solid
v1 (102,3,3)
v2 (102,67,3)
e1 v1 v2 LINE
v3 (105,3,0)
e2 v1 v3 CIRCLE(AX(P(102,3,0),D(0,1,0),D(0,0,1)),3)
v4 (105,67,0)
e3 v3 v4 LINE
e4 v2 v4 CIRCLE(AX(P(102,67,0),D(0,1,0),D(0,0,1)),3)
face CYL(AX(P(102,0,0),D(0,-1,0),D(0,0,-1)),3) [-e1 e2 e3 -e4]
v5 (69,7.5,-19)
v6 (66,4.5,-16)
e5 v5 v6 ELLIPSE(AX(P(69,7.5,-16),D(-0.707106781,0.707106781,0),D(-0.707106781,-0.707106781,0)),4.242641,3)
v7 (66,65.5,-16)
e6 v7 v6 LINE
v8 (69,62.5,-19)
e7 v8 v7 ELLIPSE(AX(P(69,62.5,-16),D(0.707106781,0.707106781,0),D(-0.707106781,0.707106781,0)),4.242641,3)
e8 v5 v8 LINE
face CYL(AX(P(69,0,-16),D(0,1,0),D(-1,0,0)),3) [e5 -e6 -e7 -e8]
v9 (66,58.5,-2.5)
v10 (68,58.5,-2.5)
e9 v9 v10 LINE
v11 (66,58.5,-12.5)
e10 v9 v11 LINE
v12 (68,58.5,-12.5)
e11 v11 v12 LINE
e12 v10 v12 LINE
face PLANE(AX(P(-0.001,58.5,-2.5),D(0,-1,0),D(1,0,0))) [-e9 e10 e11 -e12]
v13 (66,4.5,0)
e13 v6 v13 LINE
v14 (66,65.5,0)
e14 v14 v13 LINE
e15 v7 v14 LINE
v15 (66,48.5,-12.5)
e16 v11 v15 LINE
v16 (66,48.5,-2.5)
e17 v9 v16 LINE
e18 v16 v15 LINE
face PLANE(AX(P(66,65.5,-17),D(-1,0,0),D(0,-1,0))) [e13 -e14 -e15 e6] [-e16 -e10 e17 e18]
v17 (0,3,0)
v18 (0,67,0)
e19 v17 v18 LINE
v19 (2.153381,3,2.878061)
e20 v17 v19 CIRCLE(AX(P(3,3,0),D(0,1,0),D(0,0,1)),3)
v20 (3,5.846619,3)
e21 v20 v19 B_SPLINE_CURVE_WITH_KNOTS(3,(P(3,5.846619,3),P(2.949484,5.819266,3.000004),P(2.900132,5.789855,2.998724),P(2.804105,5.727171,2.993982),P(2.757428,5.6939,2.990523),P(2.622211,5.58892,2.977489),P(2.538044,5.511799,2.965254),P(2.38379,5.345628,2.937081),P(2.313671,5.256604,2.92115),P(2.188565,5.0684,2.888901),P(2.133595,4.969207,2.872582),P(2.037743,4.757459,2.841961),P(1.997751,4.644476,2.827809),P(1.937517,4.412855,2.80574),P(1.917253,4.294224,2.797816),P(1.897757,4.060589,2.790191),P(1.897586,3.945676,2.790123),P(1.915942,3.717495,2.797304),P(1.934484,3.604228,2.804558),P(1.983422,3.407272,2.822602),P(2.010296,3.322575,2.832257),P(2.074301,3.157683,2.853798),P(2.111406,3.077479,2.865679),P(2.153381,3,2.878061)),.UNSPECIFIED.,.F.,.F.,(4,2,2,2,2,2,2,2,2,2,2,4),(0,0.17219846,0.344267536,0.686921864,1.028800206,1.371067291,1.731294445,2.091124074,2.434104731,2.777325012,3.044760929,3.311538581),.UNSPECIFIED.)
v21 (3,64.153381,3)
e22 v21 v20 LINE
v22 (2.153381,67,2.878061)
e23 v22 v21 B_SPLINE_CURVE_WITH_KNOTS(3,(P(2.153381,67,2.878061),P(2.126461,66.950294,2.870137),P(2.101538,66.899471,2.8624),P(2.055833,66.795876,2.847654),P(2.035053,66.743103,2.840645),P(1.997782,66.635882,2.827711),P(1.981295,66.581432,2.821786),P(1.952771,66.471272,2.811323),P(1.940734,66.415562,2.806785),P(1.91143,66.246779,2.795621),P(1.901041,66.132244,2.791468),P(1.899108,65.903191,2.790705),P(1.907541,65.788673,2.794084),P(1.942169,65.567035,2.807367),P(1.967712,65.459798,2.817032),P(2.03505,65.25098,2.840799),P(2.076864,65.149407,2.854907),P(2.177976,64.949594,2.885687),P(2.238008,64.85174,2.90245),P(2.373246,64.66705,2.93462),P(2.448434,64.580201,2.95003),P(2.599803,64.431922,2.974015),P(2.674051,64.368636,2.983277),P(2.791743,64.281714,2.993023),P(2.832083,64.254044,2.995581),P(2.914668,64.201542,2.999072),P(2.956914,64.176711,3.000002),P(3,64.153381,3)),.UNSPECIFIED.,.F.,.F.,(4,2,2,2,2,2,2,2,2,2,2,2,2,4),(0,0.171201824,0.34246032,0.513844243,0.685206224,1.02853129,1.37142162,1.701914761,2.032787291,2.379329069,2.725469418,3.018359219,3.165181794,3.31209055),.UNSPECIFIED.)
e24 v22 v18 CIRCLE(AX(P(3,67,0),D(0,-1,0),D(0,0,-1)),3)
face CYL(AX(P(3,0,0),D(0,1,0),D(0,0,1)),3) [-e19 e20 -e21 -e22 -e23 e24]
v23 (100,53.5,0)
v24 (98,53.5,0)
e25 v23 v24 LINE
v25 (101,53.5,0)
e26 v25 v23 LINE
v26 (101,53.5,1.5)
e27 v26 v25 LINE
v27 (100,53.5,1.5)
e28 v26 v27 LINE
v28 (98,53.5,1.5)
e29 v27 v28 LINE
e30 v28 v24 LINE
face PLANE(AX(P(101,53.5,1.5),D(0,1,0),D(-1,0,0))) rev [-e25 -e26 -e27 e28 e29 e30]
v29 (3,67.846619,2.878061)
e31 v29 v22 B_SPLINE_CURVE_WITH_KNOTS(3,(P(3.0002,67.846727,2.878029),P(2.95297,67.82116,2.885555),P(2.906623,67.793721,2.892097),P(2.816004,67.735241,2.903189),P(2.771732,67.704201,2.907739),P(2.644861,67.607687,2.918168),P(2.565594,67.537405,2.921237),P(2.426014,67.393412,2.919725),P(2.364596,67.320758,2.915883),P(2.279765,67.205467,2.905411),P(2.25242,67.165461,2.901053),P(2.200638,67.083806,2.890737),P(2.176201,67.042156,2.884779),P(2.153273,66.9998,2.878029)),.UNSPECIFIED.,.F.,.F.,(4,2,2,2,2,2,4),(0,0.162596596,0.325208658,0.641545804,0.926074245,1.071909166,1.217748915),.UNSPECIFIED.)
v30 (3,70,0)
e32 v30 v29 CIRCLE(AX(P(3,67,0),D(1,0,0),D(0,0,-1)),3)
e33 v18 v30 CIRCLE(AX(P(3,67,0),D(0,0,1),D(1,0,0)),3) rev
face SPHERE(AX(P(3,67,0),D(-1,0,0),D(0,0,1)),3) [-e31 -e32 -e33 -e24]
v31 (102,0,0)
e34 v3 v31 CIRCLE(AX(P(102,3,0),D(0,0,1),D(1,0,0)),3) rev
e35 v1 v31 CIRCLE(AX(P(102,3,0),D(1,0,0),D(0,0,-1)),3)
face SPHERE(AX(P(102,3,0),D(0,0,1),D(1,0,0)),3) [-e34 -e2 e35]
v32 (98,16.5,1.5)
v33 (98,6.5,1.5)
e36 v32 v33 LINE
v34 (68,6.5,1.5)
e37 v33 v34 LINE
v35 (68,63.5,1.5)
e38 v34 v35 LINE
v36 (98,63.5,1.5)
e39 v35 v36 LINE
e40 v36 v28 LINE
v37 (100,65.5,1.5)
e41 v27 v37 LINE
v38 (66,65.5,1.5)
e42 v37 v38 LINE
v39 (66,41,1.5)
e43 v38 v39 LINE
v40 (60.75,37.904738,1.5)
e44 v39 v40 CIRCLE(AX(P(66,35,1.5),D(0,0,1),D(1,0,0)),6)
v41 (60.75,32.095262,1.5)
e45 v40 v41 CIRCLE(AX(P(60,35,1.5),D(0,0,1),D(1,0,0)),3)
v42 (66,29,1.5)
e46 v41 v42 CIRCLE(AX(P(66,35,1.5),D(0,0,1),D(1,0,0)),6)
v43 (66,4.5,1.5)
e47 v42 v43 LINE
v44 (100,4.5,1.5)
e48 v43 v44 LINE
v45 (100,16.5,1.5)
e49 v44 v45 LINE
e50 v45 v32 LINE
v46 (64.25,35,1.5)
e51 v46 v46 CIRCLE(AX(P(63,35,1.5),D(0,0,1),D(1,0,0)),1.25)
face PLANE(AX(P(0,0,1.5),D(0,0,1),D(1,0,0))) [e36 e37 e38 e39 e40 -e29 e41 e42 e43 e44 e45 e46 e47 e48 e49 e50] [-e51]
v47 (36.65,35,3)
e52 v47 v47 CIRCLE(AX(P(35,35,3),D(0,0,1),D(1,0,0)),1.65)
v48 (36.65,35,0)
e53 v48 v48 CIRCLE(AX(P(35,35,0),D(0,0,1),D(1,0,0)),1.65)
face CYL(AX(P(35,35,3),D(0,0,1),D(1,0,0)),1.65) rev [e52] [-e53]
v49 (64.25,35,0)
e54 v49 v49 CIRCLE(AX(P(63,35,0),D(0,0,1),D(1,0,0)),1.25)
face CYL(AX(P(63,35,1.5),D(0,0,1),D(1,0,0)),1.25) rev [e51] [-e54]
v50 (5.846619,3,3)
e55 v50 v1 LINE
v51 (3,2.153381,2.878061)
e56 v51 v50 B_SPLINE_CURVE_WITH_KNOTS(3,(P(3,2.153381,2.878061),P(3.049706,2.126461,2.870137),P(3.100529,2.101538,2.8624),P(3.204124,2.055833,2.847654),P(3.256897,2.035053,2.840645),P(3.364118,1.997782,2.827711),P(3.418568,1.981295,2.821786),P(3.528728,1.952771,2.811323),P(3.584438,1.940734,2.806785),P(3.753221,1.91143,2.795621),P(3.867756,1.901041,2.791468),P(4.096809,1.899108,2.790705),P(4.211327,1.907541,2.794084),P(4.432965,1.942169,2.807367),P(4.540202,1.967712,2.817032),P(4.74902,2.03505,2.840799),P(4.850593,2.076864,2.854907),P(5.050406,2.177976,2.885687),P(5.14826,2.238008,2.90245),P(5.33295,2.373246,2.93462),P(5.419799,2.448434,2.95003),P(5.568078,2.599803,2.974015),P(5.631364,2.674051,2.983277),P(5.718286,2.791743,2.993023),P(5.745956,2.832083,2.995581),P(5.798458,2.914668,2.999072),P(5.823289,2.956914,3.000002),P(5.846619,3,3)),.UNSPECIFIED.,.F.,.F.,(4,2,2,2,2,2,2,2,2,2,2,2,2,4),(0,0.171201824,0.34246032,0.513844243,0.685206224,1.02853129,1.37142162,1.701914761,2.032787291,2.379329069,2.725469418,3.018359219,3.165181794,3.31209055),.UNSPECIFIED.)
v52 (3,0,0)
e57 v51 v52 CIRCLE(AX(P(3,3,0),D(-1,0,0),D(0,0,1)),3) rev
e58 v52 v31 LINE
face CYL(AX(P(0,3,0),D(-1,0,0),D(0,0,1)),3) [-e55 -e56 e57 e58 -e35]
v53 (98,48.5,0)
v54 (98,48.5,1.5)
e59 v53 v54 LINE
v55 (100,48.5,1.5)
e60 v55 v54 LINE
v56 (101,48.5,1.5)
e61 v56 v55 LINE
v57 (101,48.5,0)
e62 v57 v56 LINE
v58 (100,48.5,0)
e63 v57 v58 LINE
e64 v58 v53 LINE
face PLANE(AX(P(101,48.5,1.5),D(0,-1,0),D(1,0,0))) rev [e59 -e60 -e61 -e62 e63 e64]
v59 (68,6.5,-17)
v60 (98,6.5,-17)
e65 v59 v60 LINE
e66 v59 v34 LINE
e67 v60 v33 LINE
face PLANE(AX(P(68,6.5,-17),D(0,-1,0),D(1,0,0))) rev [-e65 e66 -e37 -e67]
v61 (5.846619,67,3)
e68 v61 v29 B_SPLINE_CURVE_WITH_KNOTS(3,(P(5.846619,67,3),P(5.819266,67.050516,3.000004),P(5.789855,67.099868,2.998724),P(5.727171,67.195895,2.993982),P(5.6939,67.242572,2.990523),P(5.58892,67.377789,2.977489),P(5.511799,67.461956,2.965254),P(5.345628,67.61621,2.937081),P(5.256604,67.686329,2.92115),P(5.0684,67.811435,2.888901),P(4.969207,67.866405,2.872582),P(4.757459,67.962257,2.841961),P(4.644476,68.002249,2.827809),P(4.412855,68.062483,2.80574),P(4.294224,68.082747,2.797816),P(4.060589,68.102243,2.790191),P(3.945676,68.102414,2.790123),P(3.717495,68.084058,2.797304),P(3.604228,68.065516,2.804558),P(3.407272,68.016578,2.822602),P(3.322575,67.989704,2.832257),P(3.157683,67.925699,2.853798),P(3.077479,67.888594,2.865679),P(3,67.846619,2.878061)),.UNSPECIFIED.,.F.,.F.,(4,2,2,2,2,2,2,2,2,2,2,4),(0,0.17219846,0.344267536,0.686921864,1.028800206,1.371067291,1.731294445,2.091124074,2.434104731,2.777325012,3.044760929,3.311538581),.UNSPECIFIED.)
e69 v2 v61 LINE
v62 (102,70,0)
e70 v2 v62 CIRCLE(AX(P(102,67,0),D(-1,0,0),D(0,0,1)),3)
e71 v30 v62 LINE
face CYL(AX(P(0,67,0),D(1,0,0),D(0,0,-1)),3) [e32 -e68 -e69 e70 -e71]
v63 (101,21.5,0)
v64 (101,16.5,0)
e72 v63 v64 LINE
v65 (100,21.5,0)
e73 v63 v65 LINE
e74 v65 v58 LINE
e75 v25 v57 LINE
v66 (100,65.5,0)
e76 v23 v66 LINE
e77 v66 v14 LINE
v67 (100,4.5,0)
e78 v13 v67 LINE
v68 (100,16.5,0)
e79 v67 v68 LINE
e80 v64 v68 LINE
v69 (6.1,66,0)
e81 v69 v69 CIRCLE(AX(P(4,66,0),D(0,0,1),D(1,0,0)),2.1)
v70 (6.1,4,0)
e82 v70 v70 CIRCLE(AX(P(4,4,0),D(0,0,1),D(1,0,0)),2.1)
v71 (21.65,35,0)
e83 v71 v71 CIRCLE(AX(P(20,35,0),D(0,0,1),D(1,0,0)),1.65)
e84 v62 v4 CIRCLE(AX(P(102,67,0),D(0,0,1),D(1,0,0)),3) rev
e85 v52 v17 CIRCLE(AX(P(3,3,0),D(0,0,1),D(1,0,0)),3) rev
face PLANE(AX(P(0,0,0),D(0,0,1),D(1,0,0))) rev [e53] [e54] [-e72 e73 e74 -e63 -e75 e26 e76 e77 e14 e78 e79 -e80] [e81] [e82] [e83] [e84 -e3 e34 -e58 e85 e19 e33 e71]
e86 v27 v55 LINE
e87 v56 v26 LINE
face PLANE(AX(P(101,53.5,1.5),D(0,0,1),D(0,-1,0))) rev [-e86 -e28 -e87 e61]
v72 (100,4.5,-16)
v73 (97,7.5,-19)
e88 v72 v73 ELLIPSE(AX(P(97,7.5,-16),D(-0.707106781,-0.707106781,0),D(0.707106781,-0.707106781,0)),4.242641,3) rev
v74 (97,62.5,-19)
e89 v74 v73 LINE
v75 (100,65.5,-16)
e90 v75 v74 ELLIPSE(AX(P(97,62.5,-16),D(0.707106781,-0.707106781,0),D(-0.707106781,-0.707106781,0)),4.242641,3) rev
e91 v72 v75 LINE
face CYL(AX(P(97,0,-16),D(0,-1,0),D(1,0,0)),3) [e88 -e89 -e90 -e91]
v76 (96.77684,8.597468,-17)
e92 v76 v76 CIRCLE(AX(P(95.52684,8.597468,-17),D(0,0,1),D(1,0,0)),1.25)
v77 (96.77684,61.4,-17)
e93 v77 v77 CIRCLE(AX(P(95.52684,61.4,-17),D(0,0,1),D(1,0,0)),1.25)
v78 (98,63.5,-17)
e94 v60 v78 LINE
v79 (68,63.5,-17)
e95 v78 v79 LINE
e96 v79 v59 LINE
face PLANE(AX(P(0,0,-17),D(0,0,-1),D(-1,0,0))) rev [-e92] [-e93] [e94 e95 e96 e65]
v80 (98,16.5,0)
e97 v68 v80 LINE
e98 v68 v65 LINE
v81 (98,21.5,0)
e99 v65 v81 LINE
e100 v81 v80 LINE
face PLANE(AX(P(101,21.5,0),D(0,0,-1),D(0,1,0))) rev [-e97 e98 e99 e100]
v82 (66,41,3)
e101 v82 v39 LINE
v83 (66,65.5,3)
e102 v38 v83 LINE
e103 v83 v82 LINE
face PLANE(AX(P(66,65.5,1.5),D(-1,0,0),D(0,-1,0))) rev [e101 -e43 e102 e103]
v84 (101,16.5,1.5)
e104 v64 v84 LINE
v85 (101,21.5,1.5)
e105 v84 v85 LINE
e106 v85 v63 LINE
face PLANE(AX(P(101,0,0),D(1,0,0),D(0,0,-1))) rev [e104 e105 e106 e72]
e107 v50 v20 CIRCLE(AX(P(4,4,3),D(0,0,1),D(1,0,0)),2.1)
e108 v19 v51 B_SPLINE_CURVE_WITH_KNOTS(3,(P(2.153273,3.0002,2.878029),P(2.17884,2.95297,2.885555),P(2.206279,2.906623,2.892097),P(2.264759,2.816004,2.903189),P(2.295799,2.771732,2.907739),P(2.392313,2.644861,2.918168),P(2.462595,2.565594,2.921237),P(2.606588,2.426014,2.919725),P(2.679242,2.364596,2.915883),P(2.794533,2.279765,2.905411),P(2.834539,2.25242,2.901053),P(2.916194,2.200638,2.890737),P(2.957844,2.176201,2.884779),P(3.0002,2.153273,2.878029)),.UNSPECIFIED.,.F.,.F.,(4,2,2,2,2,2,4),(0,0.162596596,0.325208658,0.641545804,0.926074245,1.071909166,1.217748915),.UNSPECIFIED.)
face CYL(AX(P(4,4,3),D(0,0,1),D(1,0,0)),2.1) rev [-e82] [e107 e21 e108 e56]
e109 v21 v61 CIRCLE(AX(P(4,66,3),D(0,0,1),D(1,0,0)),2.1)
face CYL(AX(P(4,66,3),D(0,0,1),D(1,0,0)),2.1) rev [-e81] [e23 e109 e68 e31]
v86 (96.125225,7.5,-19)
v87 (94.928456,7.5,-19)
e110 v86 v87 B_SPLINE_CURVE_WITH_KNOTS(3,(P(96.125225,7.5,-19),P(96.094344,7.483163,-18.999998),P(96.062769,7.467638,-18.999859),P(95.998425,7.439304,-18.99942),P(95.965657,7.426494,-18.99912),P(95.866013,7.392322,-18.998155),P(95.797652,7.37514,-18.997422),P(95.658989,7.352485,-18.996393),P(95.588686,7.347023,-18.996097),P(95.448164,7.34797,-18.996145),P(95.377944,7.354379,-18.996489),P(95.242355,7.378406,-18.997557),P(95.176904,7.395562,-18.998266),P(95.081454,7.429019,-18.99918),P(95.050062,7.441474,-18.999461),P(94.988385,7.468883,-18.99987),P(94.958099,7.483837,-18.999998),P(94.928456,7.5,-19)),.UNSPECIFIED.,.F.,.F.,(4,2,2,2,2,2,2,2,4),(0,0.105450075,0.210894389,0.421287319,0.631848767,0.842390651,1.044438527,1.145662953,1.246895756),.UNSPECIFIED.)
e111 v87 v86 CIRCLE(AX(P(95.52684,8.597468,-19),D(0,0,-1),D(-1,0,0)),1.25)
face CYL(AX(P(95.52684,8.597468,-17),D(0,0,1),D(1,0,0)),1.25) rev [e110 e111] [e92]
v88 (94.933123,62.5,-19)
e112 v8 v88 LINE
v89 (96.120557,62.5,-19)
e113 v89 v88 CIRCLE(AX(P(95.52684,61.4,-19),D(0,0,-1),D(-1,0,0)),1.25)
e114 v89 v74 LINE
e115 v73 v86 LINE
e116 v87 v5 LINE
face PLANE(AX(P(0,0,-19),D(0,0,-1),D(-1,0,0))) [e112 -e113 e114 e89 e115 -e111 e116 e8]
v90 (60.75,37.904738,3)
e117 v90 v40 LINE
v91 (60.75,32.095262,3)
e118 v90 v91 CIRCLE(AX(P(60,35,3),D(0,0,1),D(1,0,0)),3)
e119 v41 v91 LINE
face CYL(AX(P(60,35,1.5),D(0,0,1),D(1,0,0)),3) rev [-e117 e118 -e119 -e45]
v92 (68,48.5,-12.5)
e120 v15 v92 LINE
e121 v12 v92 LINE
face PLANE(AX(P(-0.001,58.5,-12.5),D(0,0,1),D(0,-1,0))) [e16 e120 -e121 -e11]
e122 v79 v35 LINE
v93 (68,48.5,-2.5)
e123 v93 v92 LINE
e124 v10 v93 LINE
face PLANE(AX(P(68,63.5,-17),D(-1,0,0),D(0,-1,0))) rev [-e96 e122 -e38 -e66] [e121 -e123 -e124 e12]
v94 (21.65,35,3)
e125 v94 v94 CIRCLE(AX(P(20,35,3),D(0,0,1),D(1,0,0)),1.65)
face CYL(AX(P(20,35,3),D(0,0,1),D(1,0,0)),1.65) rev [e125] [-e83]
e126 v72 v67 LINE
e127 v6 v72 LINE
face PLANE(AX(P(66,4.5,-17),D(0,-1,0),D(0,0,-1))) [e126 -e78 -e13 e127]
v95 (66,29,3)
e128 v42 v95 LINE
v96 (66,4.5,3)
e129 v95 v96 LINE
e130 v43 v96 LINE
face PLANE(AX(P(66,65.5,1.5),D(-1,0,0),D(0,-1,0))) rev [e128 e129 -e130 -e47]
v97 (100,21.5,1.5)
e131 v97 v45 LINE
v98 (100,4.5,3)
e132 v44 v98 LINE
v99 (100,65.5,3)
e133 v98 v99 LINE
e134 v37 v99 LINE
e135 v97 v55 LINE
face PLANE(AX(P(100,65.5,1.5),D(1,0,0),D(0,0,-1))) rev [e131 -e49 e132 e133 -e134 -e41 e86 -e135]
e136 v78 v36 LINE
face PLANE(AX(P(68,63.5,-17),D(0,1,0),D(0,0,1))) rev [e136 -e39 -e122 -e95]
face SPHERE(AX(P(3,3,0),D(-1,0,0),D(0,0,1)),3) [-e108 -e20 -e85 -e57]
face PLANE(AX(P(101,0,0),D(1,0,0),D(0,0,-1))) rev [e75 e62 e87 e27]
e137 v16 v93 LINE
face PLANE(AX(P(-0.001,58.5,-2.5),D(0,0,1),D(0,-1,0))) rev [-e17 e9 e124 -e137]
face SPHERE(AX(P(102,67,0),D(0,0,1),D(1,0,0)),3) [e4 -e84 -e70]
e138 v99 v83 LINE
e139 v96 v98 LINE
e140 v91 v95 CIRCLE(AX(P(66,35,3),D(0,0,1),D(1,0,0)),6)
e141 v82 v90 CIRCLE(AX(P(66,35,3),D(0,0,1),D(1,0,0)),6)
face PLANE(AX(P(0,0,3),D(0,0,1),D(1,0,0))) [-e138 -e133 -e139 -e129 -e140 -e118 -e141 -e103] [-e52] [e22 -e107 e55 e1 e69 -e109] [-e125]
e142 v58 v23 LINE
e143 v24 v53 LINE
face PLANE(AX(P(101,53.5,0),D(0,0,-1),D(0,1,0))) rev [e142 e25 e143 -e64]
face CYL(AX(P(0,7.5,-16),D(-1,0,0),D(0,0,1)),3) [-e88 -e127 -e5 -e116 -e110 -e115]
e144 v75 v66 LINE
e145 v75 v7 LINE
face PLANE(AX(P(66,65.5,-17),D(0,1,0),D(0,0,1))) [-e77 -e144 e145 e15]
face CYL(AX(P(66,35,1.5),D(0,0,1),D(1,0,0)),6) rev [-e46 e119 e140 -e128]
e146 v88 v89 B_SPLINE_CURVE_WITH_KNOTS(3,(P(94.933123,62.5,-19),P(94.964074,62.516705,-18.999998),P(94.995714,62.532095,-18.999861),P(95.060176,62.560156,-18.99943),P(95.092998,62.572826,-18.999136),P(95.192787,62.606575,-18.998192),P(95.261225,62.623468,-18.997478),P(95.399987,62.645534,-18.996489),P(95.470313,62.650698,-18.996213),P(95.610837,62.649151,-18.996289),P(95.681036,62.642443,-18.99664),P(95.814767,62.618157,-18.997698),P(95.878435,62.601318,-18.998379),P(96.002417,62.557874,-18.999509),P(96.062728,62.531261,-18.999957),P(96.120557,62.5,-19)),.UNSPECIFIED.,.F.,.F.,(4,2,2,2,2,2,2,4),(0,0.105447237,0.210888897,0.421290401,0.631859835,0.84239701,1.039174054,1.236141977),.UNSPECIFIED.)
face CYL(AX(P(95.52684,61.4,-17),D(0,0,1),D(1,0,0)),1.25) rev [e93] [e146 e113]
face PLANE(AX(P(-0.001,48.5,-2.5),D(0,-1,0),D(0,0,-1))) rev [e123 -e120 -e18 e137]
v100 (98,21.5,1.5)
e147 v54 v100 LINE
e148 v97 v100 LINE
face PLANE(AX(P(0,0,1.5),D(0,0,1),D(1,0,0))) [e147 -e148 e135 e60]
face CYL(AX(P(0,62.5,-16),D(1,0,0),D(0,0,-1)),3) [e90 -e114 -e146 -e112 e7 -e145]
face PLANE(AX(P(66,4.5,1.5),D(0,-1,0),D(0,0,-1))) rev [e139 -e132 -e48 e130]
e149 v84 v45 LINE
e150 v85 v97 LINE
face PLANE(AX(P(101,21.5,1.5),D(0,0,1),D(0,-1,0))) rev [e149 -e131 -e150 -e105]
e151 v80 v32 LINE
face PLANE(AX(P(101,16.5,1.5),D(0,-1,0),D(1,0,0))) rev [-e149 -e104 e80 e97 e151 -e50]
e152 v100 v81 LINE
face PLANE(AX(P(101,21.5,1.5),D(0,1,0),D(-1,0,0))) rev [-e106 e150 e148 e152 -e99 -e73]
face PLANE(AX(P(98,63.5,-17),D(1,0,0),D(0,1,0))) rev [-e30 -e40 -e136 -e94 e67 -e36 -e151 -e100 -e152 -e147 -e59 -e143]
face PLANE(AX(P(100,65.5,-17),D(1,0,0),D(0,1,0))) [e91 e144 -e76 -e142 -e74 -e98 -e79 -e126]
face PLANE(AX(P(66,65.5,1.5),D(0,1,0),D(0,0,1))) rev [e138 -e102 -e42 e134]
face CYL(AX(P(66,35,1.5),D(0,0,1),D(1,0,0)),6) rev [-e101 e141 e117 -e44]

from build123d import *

# Parameters (mm, degrees)
SKETCH1_W                   = 105
SKETCH1_H                   = 70
BOSS_EXTRUDE1_DEPTH         = 3
FILLET4_R                   = 3
FILLET5_R                   = 3
FILLET6_R                   = 3
M5X0_8_TAPPED_HOLE2_D       = 4.2
SKETCH16_6_W                = 34
SKETCH16_6_H                = 61
SKETCH16_6_W_2              = 30
SKETCH16_6_H_2              = 57
BOSS_EXTRUDE3_DEPTH         = 20
CUT_EXTRUDE8_REACH          = 129.334
SKETCH21_W                  = 30
SKETCH21_H                  = 57
SKETCH20_W                  = 34
SKETCH20_H                  = 61
BOSS_EXTRUDE4_DEPTH         = 2
SKETCH22_W                  = 34
SKETCH22_H                  = 61
CUT_EXTRUDE9_DEPTH          = 1.5
FILLET8_R                   = 3
SKETCH26_R                  = 6
CUT_EXTRUDE10_DEPTH         = 1.5
M3_TAPPED_HOLE1_D           = 2.5
M3_TAPPED_HOLE1_DEPTH       = 7.5
M3_TAPPED_HOLE1_TIP         = 0.751075774
SKETCH33_W                  = 1.5
SKETCH33_H                  = 5
CUT_EXTRUDE11_DEPTH         = 3
M3_TAPPED_HOLE2_D           = 2.5
M3_TAPPED_HOLE2_DEPTH       = 7.5
M3_TAPPED_HOLE2_TIP         = 0.751075774
M3_TAPPED_HOLE3_D           = 2.5
M3_TAPPED_HOLE3_DEPTH       = 7.5
M3_TAPPED_HOLE3_TIP         = 0.751075774
CUT_EXTRUDE12_REACH         = 101.423
SKETCH37_W                  = 10
SKETCH37_H                  = 10
SKETCH39_R                  = 3
CUT_EXTRUDE13_DEPTH         = 1.5
TAP_DRILL_FOR_M4X0_7_TAP2_D = 3.3


with BuildPart() as part:
    # Sketch1 → Boss-Extrude1 (new body)
    with BuildSketch(Plane.XY):
        with Locations((52.5, 35)):
            Rectangle(SKETCH1_W, SKETCH1_H)
    extrude(amount=BOSS_EXTRUDE1_DEPTH)

    # Fillet4
    fillet4_edges = [part.edges().sort_by_distance(p)[0] for p in [
        (105, 0, 1.5),
        (105, 70, 1.5),
    ]]
    fillet(fillet4_edges, radius=FILLET4_R)

    # Fillet5
    fillet5_edges = [part.edges().sort_by_distance(p)[0] for p in [
        (51, 70, 3),
        (105, 35, 3),
        (51, 0, 3),
        (104.121320344, 69.121320344, 3),
        (104.121320344, 0.878679656, 3),
    ]]
    fillet(fillet5_edges, radius=FILLET5_R - 0.0001)  # a hair under: the kernel refuses the full size

    # Fillet6
    fillet6_edges = [part.edges().sort_by_distance(p)[0] for p in [
        (0, 35, 3),
        (0, 0.878650367, 2.121349633),
        (0, 69.121349633, 2.121349633),
    ]]
    fillet(fillet6_edges, radius=FILLET6_R - 0.0001)  # a hair under: the kernel refuses the full size

    # M5x0.8 Tapped Hole2 (through all)
    with Locations(Plane(origin=(4, 66, 3), x_dir=(1, 0, 0), z_dir=(0, 0, 1))):
        with Locations((0, 0), (0, -62)):
            Hole(M5X0_8_TAPPED_HOLE2_D / 2)

    # Sketch16<6> → Boss-Extrude3 (add)
    with BuildSketch(Plane.XY.offset(3)):
        with Locations((83, 35)):
            Rectangle(SKETCH16_6_W, SKETCH16_6_H)
        with Locations((83, 35)):
            Rectangle(SKETCH16_6_W_2, SKETCH16_6_H_2, mode=Mode.SUBTRACT)
    extrude(amount=-BOSS_EXTRUDE3_DEPTH)

    # Sketch21 → Cut-Extrude8 (cut, up to next)
    with BuildSketch(Plane(origin=(0, 0, 0), x_dir=(-1, 0, 0), z_dir=(0, 0, -1)), mode=Mode.PRIVATE) as cut_extrude8_sk1:
        with Locations((-83, 35)):
            Rectangle(SKETCH21_W, SKETCH21_H)
    cut_extrude8_tool1 = extrude(cut_extrude8_sk1.sketch, amount=-CUT_EXTRUDE8_REACH, mode=Mode.PRIVATE) & part.part
    add(cut_extrude8_tool1.solids().sort_by_distance((83, 35, 0))[0], mode=Mode.SUBTRACT)

    # Sketch20 → Boss-Extrude4 (add)
    with BuildSketch(Plane(origin=(0, 0, -17), x_dir=(-1, 0, 0), z_dir=(0, 0, -1))):
        with Locations((-83, 35)):
            Rectangle(SKETCH20_W, SKETCH20_H)
    extrude(amount=BOSS_EXTRUDE4_DEPTH)

    # Sketch22 → Cut-Extrude9 (cut)
    with BuildSketch(Plane.XY.offset(3)):
        with Locations((83, 35)):
            Rectangle(SKETCH22_W, SKETCH22_H)
    extrude(amount=-CUT_EXTRUDE9_DEPTH, mode=Mode.SUBTRACT)

    # Fillet8
    fillet8_edges = [part.edges().sort_by_distance(p)[0] for p in [
        (100, 35, -19),
        (83, 4.5, -19),
        (66, 35, -19),
        (83, 65.5, -19),
    ]]
    fillet(fillet8_edges, radius=FILLET8_R)

    # Sketch26 → Cut-Extrude10 (cut)
    with BuildSketch(Plane.XY.offset(3)):
        with Locations((66, 35)):
            Circle(SKETCH26_R)
    extrude(amount=-CUT_EXTRUDE10_DEPTH, mode=Mode.SUBTRACT)

    # M3 Tapped Hole1
    with Locations(Plane(origin=(63, 35, 1.5), x_dir=(1, 0, 0), z_dir=(0, 0, 1))):
        with Locations((0, 0)):
            Hole(M3_TAPPED_HOLE1_D / 2, depth=M3_TAPPED_HOLE1_DEPTH)
            with Locations((0, 0, -(M3_TAPPED_HOLE1_DEPTH + M3_TAPPED_HOLE1_TIP / 2))):  # 118° drill point
                Cone(0, M3_TAPPED_HOLE1_D / 2, M3_TAPPED_HOLE1_TIP, mode=Mode.SUBTRACT)

    # Sketch33 → Cut-Extrude11 (cut)
    with BuildSketch(Plane.ZY.offset(-98)):
        with Locations((0.75, 51)):
            Rectangle(SKETCH33_W, SKETCH33_H)
        with Locations((0.75, 19)):
            Rectangle(SKETCH33_W, SKETCH33_H)
    extrude(amount=-CUT_EXTRUDE11_DEPTH, mode=Mode.SUBTRACT)

    # M3 Tapped Hole2
    with Locations(Plane(origin=(95.52684029, 8.597468083, -17), x_dir=(1, 0, 0), z_dir=(0, 0, 1))):
        with Locations((0, 0)):
            Hole(M3_TAPPED_HOLE2_D / 2, depth=M3_TAPPED_HOLE2_DEPTH)
            with Locations((0, 0, -(M3_TAPPED_HOLE2_DEPTH + M3_TAPPED_HOLE2_TIP / 2))):  # 118° drill point
                Cone(0, M3_TAPPED_HOLE2_D / 2, M3_TAPPED_HOLE2_TIP, mode=Mode.SUBTRACT)

    # M3 Tapped Hole3
    with Locations(Plane(origin=(95.52684029, 61.4, -17), x_dir=(1, 0, 0), z_dir=(0, 0, 1))):
        with Locations((0, 0)):
            Hole(M3_TAPPED_HOLE3_D / 2, depth=M3_TAPPED_HOLE3_DEPTH)
            with Locations((0, 0, -(M3_TAPPED_HOLE3_DEPTH + M3_TAPPED_HOLE3_TIP / 2))):  # 118° drill point
                Cone(0, M3_TAPPED_HOLE3_D / 2, M3_TAPPED_HOLE3_TIP, mode=Mode.SUBTRACT)

    # Sketch37 → Cut-Extrude12 (cut, up to next)
    with BuildSketch(Plane(origin=(68, 0, 0), x_dir=(0, 0, -1), z_dir=(1, 0, 0)), mode=Mode.PRIVATE) as cut_extrude12_sk1:
        with Locations((7.5, 53.5)):
            Rectangle(SKETCH37_W, SKETCH37_H)
    cut_extrude12_tool1 = extrude(cut_extrude12_sk1.sketch, amount=-CUT_EXTRUDE12_REACH, mode=Mode.PRIVATE) & part.part
    add(cut_extrude12_tool1.solids().sort_by_distance((68, 53.5, -7.5))[0], mode=Mode.SUBTRACT)

    # Sketch39 → Cut-Extrude13 (cut)
    with BuildSketch(Plane.XY.offset(3)):
        with Locations((60, 35)):
            Circle(SKETCH39_R)
    extrude(amount=-CUT_EXTRUDE13_DEPTH, mode=Mode.SUBTRACT)

    # Tap Drill for M4x0.7 Tap2 (through all)
    with Locations(Plane(origin=(20, 35, 3), x_dir=(1, 0, 0), z_dir=(0, 0, 1))):
        with Locations((0, 0), (15, 0)):
            Hole(TAP_DRILL_FOR_M4X0_7_TAP2_D / 2)


solid = part.part
